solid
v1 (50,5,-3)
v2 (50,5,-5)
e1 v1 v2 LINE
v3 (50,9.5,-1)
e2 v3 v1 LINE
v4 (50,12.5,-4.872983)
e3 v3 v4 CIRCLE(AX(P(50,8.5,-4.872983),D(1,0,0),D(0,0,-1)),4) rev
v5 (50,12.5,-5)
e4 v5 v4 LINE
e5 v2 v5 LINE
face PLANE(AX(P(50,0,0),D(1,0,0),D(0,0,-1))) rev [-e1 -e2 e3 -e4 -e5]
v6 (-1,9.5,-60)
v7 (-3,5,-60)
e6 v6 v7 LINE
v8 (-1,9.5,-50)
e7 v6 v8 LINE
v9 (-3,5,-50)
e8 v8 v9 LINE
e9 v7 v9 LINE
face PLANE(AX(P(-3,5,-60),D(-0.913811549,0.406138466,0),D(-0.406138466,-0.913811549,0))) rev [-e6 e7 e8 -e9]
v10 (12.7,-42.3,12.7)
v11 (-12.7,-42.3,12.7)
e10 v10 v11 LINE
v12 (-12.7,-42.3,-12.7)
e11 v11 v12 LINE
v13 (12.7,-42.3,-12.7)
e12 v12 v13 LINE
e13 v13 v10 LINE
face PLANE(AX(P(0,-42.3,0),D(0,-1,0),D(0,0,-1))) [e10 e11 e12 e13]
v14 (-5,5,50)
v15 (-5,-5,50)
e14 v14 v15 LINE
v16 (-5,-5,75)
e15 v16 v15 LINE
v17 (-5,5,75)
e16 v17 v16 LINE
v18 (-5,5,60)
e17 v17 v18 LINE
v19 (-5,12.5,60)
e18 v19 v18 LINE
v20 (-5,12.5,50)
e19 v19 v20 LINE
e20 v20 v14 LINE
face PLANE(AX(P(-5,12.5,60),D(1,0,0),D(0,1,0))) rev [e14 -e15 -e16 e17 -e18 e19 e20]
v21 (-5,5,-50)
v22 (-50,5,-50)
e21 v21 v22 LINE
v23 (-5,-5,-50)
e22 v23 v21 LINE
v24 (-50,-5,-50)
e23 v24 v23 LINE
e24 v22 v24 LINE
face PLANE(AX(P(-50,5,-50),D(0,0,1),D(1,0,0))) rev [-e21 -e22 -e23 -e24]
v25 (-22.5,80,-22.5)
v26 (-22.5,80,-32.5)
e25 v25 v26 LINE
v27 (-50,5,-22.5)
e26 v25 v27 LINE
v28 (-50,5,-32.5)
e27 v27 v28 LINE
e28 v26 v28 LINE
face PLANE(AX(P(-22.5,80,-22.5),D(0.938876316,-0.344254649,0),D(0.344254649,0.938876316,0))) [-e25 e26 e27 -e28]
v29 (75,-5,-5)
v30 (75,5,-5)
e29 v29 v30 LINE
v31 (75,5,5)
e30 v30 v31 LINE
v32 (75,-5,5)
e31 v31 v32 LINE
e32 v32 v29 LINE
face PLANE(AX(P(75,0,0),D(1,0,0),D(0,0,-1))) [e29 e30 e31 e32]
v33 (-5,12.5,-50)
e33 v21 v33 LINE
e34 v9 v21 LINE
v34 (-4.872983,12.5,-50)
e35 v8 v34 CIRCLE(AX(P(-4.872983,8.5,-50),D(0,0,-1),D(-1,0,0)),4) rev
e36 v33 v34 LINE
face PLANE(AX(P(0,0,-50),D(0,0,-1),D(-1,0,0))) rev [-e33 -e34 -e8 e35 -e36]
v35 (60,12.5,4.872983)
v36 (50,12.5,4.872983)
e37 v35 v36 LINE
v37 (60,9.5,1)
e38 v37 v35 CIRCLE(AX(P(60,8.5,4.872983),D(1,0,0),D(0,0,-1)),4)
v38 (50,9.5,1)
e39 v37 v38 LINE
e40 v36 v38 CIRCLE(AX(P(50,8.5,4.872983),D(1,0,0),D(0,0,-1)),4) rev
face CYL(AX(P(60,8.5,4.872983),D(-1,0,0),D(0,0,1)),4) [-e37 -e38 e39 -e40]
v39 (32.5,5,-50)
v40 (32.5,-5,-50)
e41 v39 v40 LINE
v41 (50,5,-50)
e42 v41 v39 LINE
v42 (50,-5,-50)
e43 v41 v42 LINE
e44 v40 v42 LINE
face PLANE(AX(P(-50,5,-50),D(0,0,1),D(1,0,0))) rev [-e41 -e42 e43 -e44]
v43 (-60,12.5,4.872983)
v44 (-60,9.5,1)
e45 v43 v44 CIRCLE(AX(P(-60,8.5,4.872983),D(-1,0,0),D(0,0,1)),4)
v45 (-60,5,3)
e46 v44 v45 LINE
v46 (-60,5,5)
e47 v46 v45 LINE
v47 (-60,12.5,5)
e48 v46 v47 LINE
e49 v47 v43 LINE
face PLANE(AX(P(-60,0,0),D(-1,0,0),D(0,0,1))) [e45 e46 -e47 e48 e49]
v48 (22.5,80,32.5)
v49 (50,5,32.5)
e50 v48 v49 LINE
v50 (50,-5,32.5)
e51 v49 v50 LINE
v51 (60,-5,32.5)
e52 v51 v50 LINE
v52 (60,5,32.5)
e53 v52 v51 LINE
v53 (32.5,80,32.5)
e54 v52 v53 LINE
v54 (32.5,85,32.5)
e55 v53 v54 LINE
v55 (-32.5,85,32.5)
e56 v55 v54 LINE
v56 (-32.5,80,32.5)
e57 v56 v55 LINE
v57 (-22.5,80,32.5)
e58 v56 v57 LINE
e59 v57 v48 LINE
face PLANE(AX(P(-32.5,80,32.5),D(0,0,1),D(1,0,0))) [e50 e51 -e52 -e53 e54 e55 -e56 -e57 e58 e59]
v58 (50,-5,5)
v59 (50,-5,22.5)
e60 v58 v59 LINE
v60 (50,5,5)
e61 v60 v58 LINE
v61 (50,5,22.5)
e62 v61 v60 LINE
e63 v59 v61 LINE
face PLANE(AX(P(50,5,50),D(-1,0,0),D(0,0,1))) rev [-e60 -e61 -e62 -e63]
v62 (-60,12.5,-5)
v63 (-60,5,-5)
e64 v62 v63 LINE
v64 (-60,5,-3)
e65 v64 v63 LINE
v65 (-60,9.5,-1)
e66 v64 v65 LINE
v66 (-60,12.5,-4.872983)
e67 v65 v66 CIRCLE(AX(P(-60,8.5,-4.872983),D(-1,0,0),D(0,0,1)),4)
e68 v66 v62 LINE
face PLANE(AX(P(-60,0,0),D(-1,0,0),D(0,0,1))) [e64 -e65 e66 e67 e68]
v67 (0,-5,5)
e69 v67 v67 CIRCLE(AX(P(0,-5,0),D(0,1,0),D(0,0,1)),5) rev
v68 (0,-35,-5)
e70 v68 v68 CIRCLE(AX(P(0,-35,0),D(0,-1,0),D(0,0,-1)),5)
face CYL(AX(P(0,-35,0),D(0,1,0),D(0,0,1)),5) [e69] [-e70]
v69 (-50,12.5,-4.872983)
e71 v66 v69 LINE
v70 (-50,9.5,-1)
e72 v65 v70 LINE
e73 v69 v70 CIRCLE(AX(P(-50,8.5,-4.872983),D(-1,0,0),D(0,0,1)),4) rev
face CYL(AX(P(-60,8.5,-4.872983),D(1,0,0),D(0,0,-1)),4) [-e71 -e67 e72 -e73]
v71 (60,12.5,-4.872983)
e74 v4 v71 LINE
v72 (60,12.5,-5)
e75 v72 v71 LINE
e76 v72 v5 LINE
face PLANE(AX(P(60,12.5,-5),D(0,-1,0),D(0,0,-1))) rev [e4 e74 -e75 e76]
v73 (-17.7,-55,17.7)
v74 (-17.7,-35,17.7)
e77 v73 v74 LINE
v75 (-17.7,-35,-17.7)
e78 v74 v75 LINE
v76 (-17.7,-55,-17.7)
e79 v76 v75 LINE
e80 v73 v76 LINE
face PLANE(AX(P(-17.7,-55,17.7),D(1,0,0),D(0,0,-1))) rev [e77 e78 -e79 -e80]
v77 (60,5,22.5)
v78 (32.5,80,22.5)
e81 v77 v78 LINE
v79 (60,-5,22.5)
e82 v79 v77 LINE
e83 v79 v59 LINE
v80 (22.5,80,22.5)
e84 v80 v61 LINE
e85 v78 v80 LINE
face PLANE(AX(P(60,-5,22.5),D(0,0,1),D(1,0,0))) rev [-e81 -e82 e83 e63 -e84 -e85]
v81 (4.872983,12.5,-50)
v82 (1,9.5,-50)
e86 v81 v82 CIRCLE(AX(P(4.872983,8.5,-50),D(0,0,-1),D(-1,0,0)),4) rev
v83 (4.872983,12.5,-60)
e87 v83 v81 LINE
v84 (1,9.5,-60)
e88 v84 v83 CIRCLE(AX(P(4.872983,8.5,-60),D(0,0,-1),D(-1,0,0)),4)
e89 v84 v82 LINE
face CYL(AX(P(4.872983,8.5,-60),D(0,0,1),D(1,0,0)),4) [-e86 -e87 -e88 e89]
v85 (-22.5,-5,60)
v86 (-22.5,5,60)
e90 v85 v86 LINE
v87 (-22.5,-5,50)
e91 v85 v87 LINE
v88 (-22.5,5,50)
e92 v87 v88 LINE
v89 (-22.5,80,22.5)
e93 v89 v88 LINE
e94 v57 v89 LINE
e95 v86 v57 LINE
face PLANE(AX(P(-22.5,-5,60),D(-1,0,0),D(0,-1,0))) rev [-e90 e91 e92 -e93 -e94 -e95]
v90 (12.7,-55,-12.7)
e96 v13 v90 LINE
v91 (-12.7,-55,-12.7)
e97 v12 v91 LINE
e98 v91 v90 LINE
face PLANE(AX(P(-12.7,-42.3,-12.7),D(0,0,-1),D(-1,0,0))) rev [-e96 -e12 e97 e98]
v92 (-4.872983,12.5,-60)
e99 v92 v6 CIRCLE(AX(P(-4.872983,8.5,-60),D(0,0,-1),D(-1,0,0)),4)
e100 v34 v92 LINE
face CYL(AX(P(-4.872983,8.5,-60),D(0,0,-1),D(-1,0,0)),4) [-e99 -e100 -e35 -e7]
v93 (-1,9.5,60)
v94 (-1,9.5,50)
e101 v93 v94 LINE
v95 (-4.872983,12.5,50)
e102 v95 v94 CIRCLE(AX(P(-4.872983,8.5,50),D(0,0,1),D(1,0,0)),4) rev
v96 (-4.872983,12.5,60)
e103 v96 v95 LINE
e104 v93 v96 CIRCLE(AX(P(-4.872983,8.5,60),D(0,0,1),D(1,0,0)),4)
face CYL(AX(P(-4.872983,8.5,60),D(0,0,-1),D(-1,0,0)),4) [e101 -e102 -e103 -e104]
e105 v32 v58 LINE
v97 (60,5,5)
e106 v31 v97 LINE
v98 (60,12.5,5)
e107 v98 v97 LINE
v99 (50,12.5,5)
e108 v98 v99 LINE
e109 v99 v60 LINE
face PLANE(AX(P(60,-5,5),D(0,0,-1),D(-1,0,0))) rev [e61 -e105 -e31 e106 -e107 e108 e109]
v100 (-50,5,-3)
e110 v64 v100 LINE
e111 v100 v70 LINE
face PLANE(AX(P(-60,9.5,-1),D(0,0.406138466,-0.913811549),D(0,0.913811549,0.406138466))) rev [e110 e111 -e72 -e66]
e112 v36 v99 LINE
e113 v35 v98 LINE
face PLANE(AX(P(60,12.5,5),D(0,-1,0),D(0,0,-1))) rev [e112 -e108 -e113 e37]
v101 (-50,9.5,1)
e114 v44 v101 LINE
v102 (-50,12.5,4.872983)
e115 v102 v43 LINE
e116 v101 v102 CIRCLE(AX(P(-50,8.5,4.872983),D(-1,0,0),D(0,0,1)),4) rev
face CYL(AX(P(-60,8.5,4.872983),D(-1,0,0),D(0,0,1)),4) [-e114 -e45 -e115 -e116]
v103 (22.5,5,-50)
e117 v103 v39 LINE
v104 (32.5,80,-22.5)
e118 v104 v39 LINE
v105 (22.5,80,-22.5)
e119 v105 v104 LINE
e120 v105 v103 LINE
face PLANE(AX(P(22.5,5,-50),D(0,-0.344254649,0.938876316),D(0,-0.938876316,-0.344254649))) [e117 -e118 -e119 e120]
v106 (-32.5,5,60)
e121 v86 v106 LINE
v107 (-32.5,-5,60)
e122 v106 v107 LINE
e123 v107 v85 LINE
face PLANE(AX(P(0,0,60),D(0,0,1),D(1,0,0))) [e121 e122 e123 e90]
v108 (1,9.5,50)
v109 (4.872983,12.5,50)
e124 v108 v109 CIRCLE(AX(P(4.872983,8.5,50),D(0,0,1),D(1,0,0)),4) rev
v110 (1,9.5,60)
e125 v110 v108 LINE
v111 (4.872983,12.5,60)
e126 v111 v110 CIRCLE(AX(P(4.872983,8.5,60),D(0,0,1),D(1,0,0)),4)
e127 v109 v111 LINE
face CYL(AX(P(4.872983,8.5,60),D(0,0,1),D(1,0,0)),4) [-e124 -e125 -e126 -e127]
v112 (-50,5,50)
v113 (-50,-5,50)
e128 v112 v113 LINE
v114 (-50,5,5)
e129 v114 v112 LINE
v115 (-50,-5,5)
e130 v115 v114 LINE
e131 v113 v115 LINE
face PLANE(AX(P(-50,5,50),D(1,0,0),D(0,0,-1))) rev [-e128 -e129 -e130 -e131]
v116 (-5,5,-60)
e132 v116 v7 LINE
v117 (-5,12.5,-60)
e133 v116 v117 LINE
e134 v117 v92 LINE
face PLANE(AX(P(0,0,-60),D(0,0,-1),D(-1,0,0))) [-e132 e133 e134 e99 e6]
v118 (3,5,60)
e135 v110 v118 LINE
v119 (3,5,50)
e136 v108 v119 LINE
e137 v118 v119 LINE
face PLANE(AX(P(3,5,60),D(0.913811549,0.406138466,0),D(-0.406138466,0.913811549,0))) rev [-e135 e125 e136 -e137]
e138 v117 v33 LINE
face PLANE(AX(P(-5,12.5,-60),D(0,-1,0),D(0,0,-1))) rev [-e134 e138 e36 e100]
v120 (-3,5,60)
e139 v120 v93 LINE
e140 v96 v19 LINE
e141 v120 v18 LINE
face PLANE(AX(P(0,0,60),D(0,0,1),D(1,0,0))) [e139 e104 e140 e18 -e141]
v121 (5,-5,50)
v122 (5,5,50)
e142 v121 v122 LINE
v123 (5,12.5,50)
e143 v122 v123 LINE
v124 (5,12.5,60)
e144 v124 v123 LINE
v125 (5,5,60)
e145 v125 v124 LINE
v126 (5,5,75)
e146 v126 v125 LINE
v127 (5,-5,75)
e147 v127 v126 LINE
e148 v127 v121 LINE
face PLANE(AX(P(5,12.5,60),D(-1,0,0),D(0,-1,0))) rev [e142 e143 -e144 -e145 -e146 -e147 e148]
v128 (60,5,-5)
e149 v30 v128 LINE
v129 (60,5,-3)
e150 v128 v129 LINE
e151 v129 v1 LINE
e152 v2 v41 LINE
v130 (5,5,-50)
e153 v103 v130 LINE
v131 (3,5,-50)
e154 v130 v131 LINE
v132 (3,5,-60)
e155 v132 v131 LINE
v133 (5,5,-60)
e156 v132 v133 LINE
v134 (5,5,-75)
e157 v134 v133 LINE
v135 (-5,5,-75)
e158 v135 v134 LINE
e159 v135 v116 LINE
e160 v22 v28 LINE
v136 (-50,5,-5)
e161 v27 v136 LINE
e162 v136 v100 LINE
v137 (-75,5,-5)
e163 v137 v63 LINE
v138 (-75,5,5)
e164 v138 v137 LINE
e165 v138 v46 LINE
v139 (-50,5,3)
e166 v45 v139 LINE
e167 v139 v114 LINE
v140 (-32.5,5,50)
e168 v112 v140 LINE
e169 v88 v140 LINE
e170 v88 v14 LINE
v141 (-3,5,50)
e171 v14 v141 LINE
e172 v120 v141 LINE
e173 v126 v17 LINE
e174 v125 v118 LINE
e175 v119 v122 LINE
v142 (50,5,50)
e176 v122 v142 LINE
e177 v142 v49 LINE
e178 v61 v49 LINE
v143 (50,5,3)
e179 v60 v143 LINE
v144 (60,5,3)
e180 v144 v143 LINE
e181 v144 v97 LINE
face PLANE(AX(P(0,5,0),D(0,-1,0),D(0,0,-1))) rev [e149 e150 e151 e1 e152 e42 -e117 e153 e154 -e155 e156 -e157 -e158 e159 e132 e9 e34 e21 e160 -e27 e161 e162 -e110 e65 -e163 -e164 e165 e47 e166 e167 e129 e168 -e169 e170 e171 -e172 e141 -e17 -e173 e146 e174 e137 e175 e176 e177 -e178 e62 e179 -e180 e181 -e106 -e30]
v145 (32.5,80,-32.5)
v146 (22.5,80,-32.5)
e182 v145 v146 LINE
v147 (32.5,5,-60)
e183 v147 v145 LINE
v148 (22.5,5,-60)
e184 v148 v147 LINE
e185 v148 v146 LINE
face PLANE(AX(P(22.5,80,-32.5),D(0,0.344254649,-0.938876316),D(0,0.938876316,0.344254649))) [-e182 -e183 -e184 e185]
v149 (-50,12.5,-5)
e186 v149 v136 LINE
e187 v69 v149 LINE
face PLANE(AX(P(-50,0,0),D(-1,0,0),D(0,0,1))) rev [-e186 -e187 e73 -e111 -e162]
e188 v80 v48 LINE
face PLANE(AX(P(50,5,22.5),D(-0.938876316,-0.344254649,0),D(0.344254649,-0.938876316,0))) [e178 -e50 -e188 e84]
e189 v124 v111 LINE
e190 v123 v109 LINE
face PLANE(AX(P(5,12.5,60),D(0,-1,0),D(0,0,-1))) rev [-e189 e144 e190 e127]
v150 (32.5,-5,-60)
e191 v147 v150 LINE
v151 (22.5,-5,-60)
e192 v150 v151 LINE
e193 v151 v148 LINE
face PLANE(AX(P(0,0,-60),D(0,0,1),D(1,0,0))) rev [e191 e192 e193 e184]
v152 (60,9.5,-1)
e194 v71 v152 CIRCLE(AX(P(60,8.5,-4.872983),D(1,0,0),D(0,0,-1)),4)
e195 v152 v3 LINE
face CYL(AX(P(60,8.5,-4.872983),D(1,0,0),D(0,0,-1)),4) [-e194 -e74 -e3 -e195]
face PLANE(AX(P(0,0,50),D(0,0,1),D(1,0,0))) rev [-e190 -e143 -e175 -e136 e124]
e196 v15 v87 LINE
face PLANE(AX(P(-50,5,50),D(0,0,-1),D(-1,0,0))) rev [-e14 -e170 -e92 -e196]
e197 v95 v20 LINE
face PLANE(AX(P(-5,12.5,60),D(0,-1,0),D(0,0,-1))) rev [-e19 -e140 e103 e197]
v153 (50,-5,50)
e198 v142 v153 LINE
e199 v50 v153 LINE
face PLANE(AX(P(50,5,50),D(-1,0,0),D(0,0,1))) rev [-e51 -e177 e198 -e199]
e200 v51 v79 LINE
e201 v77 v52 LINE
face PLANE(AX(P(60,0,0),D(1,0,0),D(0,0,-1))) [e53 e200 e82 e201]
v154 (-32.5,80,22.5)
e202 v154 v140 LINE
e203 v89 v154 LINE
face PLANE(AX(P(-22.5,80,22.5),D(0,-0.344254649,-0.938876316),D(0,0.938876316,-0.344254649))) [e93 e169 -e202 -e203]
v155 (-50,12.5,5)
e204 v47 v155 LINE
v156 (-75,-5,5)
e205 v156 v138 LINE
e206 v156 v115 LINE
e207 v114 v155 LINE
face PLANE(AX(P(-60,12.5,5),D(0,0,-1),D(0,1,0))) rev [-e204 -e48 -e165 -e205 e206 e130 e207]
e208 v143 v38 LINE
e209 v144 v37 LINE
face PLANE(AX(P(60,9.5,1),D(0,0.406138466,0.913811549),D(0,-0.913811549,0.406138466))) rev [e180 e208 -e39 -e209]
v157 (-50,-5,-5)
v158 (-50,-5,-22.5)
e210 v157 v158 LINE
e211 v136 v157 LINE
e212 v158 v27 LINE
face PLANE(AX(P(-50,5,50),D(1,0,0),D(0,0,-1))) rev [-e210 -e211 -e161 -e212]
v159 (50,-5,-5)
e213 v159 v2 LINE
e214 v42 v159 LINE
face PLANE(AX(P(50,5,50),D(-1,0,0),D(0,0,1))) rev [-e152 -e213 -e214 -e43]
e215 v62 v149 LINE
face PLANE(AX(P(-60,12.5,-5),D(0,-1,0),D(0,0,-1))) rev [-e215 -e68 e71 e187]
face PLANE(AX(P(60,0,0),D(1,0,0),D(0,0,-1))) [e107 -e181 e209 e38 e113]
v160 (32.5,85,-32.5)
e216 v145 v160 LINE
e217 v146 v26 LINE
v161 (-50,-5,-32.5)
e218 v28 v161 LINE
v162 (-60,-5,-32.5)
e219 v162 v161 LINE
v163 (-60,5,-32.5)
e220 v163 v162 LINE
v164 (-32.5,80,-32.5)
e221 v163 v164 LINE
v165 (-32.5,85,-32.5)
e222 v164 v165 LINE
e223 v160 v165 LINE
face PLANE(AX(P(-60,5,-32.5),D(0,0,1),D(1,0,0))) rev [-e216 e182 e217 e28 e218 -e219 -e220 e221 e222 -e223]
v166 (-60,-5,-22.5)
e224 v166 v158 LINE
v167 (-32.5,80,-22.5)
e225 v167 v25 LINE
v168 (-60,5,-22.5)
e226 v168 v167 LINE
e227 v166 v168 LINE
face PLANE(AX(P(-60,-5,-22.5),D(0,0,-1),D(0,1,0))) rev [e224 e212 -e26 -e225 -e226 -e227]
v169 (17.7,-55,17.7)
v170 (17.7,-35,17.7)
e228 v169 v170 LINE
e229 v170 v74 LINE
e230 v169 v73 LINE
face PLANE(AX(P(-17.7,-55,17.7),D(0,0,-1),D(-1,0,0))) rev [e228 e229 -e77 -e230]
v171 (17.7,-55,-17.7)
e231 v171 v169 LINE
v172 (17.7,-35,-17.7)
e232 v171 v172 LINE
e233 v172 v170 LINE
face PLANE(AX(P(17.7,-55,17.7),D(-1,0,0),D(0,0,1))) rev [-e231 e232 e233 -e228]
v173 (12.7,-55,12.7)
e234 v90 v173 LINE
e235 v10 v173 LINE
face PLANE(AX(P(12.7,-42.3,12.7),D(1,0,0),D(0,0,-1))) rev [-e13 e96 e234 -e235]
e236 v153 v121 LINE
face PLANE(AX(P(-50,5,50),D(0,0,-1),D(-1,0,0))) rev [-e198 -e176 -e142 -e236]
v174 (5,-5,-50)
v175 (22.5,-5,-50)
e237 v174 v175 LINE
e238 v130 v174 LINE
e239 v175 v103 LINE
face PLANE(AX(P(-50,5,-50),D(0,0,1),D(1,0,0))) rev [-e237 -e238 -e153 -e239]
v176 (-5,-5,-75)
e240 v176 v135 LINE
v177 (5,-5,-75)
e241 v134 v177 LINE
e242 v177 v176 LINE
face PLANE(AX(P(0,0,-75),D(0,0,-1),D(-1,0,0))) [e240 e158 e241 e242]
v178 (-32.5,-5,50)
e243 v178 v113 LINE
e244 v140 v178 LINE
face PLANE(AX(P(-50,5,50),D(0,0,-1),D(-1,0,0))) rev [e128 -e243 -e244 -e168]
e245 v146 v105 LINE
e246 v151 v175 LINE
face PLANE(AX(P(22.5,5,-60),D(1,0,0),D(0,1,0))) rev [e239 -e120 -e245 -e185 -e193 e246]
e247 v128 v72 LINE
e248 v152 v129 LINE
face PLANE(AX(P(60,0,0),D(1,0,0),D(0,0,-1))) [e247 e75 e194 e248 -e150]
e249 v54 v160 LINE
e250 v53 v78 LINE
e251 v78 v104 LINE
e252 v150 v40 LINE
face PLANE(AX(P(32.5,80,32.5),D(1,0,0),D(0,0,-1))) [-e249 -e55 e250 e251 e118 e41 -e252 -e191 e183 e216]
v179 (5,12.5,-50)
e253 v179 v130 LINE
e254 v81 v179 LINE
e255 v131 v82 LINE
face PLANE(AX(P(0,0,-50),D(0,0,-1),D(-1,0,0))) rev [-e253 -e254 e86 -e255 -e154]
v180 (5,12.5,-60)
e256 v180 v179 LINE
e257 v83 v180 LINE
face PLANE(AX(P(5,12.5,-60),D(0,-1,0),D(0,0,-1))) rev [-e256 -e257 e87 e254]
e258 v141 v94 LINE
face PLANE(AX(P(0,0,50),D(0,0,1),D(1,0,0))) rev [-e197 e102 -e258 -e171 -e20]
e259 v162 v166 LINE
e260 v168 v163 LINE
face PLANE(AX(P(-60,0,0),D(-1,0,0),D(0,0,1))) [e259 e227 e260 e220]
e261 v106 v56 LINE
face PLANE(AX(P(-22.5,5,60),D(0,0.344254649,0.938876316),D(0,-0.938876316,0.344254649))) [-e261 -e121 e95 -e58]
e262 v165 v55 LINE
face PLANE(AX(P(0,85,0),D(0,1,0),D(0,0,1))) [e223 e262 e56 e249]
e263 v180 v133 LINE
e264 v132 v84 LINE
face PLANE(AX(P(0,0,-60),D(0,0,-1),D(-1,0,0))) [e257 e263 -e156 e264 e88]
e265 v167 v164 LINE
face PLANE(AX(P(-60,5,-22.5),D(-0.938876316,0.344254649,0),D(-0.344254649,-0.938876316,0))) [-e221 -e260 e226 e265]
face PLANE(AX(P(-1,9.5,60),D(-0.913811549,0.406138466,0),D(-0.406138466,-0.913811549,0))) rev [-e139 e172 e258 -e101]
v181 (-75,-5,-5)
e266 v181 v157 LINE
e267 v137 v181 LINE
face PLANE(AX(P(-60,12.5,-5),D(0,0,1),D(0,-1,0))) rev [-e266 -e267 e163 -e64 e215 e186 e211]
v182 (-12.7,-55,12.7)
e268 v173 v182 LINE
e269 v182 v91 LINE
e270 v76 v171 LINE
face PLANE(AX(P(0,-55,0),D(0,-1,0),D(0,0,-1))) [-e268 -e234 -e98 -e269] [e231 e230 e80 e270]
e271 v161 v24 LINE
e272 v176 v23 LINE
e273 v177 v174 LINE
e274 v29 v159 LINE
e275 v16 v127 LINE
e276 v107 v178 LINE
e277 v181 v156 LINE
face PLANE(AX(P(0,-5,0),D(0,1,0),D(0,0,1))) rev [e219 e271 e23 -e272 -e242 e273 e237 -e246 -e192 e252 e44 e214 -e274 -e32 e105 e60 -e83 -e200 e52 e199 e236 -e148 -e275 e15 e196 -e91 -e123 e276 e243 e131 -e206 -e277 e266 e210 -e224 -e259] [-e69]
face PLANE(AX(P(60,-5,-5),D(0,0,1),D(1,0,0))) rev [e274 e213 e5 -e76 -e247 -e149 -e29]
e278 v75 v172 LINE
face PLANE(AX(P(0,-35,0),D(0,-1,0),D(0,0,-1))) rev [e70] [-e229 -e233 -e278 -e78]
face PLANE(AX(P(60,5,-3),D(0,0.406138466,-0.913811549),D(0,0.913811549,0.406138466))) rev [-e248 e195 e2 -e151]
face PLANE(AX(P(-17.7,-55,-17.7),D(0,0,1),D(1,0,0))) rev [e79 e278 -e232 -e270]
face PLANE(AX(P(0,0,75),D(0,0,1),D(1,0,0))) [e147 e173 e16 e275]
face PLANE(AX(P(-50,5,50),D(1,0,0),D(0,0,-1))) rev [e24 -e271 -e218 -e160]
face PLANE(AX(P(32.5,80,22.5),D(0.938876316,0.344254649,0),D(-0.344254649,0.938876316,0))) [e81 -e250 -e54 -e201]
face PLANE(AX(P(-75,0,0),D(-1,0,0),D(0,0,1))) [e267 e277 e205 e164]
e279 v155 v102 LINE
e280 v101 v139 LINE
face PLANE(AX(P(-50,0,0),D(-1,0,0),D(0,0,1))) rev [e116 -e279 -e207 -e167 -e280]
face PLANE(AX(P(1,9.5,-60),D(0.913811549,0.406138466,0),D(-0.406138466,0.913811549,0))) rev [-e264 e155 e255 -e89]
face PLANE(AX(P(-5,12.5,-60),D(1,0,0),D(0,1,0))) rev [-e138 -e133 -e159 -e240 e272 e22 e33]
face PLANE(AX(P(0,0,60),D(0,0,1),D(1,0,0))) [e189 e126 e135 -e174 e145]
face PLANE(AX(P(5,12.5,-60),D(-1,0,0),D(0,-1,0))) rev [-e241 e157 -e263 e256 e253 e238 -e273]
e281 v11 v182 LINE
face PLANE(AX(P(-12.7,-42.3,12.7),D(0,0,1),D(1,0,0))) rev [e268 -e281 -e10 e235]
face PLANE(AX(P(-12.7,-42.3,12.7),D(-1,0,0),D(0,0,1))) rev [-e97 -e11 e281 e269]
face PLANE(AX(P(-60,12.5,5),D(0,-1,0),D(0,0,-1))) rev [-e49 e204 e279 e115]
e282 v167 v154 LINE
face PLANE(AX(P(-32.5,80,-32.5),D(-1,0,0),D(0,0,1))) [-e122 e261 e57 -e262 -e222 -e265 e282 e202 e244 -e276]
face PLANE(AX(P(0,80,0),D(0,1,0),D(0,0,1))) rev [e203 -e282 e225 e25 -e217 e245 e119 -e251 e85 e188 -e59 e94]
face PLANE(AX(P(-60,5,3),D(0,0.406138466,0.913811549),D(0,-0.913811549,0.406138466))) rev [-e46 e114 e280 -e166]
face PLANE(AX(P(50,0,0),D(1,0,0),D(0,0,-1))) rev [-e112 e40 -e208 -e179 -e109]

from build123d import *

# Parameters (mm, degrees)
SKETCH2_W            = 100
SKETCH2_H            = 100
BOSS_EXTRUDE1_DEPTH  = 5
SKETCH3_W            = 100
SKETCH3_H            = 100
BOSS_EXTRUDE2_DEPTH  = 5
SKETCH8_R            = 5
BOSS_EXTRUDE7_DEPTH  = 30
SKETCH9_W            = 35.4
SKETCH9_H            = 35.4
BOSS_EXTRUDE8_DEPTH  = 20
SKETCH10_W           = 25.4
SKETCH10_H           = 25.4
CUT_EXTRUDE1_DEPTH   = 12.7
BOSS_EXTRUDE21_DEPTH = 10
FILLET14_R           = 4
FILLET13_R           = 4
SKETCH24_W           = 10
SKETCH24_H           = 10
BOSS_EXTRUDE22_DEPTH = 15
BOSS_EXTRUDE25_DEPTH = 10
SKETCH26_W           = 10
SKETCH26_H           = 10
BOSS_EXTRUDE26_DEPTH = 15
FILLET18_R           = 4
FILLET17_R           = 4
BOSS_EXTRUDE23_DEPTH = 10
SKETCH25_W           = 10
SKETCH25_H           = 10
BOSS_EXTRUDE24_DEPTH = 15
FILLET15_R           = 4
FILLET16_R           = 4
BOSS_EXTRUDE10_DEPTH = 10
FILLET19_R           = 4
SKETCH27_W           = 10
SKETCH27_H           = 10
BOSS_EXTRUDE27_DEPTH = 15
FILLET20_R           = 4
SKETCH33_W           = 65
SKETCH33_H           = 65
BOSS_EXTRUDE29_DEPTH = 5
BOSS_EXTRUDE28_DEPTH = 10
BOSS_EXTRUDE32_DEPTH = 10
BOSS_EXTRUDE31_DEPTH = 10
BOSS_EXTRUDE33_DEPTH = 10
BOSS_EXTRUDE34_DEPTH = 10
BOSS_EXTRUDE35_DEPTH = 10
BOSS_EXTRUDE36_DEPTH = 10
BOSS_EXTRUDE37_DEPTH = 10


with BuildPart() as part:
    # Sketch2 → Boss-Extrude1 (new body)
    with BuildSketch(Plane(origin=(0, 0, 0), x_dir=(1, 0, 0), z_dir=(0, 1, 0))):
        Rectangle(SKETCH2_W, SKETCH2_H)
    extrude(amount=BOSS_EXTRUDE1_DEPTH)

    # Sketch3 → Boss-Extrude2 (add)
    with BuildSketch(Plane.XZ):
        Rectangle(SKETCH3_W, SKETCH3_H)
    extrude(amount=BOSS_EXTRUDE2_DEPTH)

    # Sketch8 → Boss-Extrude7 (add)
    with BuildSketch(Plane.XZ.offset(5)):
        with Locations(Location((0, 0, 0), (0, 0, 90))):
            Circle(SKETCH8_R)
    extrude(amount=BOSS_EXTRUDE7_DEPTH)

    # Sketch9 → Boss-Extrude8 (add)
    with BuildSketch(Plane.XZ.offset(35)):
        Rectangle(SKETCH9_W, SKETCH9_H)
    extrude(amount=BOSS_EXTRUDE8_DEPTH)

    # Sketch10 → Cut-Extrude1 (cut)
    with BuildSketch(Plane.XZ.offset(55)):
        Rectangle(SKETCH10_W, SKETCH10_H)
    extrude(amount=-CUT_EXTRUDE1_DEPTH, mode=Mode.SUBTRACT)

    # Sketch11 → Boss-Extrude21 (add)
    with BuildSketch(Plane(origin=(50, 0, 0), x_dir=(0, 0, -1), z_dir=(1, 0, 0))):
        Polygon((5, -5), (5, 12.5), (1, 12.5), (1, 9.5), (3, 5), (-3, 5), (-1, 9.5), (-1, 12.5), (-5, 12.5), (-5, -5), align=None)
    extrude(amount=BOSS_EXTRUDE21_DEPTH)

    # Fillet14
    # the kernel refuses this fillet: 4 mm, written as the material it takes off along each edge
    with BuildSketch(Plane(origin=(40.317541634, 12.5, -1), x_dir=(0, 0, -1), z_dir=(1, 0, 0))) as fillet14_piece_1:
        with BuildLine():
            CenterArc((3.872983346, -4), FILLET14_R, 90, 75.522487814)
            Line((0, -3), (-0.077459667, -2.98))
            ThreePointArc((-0.077459667, -2.98), (-0.08, -1.5), (-0.08, 0))
            Line((-0.08, 0), (0, 0.08))
            Line((0, 0.08), (3.872983346, 0.08))
            Line((3.872983346, 0.08), (3.872983346, 0))
        make_face()
    extrude(amount=29.364916731, mode=Mode.SUBTRACT)

    # Fillet13
    # the kernel refuses this fillet: 4 mm, written as the material it takes off along each edge
    with BuildSketch(Plane(origin=(40.317541634, 12.5, 1), x_dir=(0, 0, 1), z_dir=(1, 0, 0))) as fillet13_piece_1:
        with BuildLine():
            CenterArc((3.872983346, 4), FILLET13_R, 194.477512186, 75.522487814)
            Line((0, 3), (-0.077459667, 2.98))
            ThreePointArc((-0.077459667, 2.98), (-0.08, 1.5), (-0.08, 0))
            Line((-0.08, 0), (0, -0.08))
            Line((0, -0.08), (3.872983346, -0.08))
            Line((3.872983346, -0.08), (3.872983346, 0))
        make_face()
    extrude(amount=29.364916731, mode=Mode.SUBTRACT)

    # Sketch24 → Boss-Extrude22 (add)
    with BuildSketch(Plane(origin=(60, 0, 0), x_dir=(0, 0, -1), z_dir=(1, 0, 0))):
        Rectangle(SKETCH24_W, SKETCH24_H)
    extrude(amount=BOSS_EXTRUDE22_DEPTH)

    # Sketch13 → Boss-Extrude25 (add)
    with BuildSketch(Plane.ZY.offset(50)):
        Polygon((-5, 12.5), (-5, -5), (5, -5), (5, 12.5), (1, 12.5), (1, 9.5), (3, 5), (-3, 5), (-1, 9.5), (-1, 12.5), align=None)
    extrude(amount=BOSS_EXTRUDE25_DEPTH)

    # Sketch26 → Boss-Extrude26 (add)
    with BuildSketch(Plane.ZY.offset(60)):
        Rectangle(SKETCH26_W, SKETCH26_H)
    extrude(amount=BOSS_EXTRUDE26_DEPTH)

    # Fillet18
    # the kernel refuses this fillet: 4 mm, written as the material it takes off along each edge
    with BuildSketch(Plane(origin=(-40.317541634, 12.5, 1), x_dir=(0, 0, 1), z_dir=(-1, 0, 0))) as fillet18_piece_1:
        with BuildLine():
            CenterArc((3.872983346, -4), FILLET18_R, 90, 75.522487814)
            Line((0, -3), (-0.077459667, -2.98))
            ThreePointArc((-0.077459667, -2.98), (-0.08, -1.5), (-0.08, 0))
            Line((-0.08, 0), (0, 0.08))
            Line((0, 0.08), (3.872983346, 0.08))
            Line((3.872983346, 0.08), (3.872983346, 0))
        make_face()
    extrude(amount=29.364916731, mode=Mode.SUBTRACT)

    # Fillet17
    # the kernel refuses this fillet: 4 mm, written as the material it takes off along each edge
    with BuildSketch(Plane(origin=(-40.317541634, 12.5, -1), x_dir=(0, 0, -1), z_dir=(-1, 0, 0))) as fillet17_piece_1:
        with BuildLine():
            CenterArc((3.872983346, 4), FILLET17_R, 194.477512186, 75.522487814)
            Line((0, 3), (-0.077459667, 2.98))
            ThreePointArc((-0.077459667, 2.98), (-0.08, 1.5), (-0.08, 0))
            Line((-0.08, 0), (0, -0.08))
            Line((0, -0.08), (3.872983346, -0.08))
            Line((3.872983346, -0.08), (3.872983346, 0))
        make_face()
    extrude(amount=29.364916731, mode=Mode.SUBTRACT)

    # Sketch14 → Boss-Extrude23 (add)
    with BuildSketch(Plane(origin=(0, 0, -50), x_dir=(-1, 0, 0), z_dir=(0, 0, -1))):
        Polygon((-5, 12.5), (-1, 12.5), (-1, 9.5), (-3, 5), (3, 5), (1, 9.5), (1, 12.5), (5, 12.5), (5, -5), (-5, -5), align=None)
    extrude(amount=BOSS_EXTRUDE23_DEPTH)

    # Sketch25 → Boss-Extrude24 (add)
    with BuildSketch(Plane(origin=(0, 0, -60), x_dir=(-1, 0, 0), z_dir=(0, 0, -1))):
        Rectangle(SKETCH25_W, SKETCH25_H)
    extrude(amount=BOSS_EXTRUDE24_DEPTH)

    # Fillet15
    # the kernel refuses this fillet: 4 mm, written as the material it takes off along each edge
    with BuildSketch(Plane(origin=(-1, 12.5, -40.317541634), x_dir=(0, -1, 0), z_dir=(0, 0, -1))) as fillet15_piece_1:
        with BuildLine():
            CenterArc((4, 3.872983346), FILLET15_R, 180, 75.522487814)
            Line((0, 3.872983346), (-0.08, 3.872983346))
            Line((-0.08, 3.872983346), (-0.08, 0))
            Line((-0.08, 0), (0, -0.08))
            ThreePointArc((0, -0.08), (1.5, -0.08), (2.98, -0.077459667))
            Line((2.98, -0.077459667), (3, 0))
        make_face()
    extrude(amount=29.364916731, mode=Mode.SUBTRACT)

    # Fillet16
    # the kernel refuses this fillet: 4 mm, written as the material it takes off along each edge
    with BuildSketch(Plane(origin=(1, 12.5, -40.317541634), x_dir=(1, 0, 0), z_dir=(0, 0, -1))) as fillet16_piece_1:
        with BuildLine():
            CenterArc((3.872983346, 4), FILLET16_R, 194.477512186, 75.522487814)
            Line((0, 3), (-0.077459667, 2.98))
            ThreePointArc((-0.077459667, 2.98), (-0.08, 1.5), (-0.08, 0))
            Line((-0.08, 0), (0, -0.08))
            Line((0, -0.08), (3.872983346, -0.08))
            Line((3.872983346, -0.08), (3.872983346, 0))
        make_face()
    extrude(amount=29.364916731, mode=Mode.SUBTRACT)

    # Sketch12 → Boss-Extrude10 (add)
    with BuildSketch(Plane.XY.offset(50)):
        Polygon((-5, 12.5), (-5, -5), (5, -5), (5, 12.5), (1, 12.5), (1, 9.5), (3, 5), (-3, 5), (-1, 9.5), (-1, 12.5), align=None)
    extrude(amount=BOSS_EXTRUDE10_DEPTH)

    # Fillet19
    # the kernel refuses this fillet: 4 mm, written as the material it takes off along each edge
    with BuildSketch(Plane(origin=(-1, 12.5, 40.317541634), x_dir=(-1, 0, 0), z_dir=(0, 0, 1))) as fillet19_piece_1:
        with BuildLine():
            CenterArc((3.872983346, 4), FILLET19_R, 194.477512186, 75.522487814)
            Line((0, 3), (-0.077459667, 2.98))
            ThreePointArc((-0.077459667, 2.98), (-0.08, 1.5), (-0.08, 0))
            Line((-0.08, 0), (0, -0.08))
            Line((0, -0.08), (3.872983346, -0.08))
            Line((3.872983346, -0.08), (3.872983346, 0))
        make_face()
    extrude(amount=29.364916731, mode=Mode.SUBTRACT)

    # Sketch27 → Boss-Extrude27 (add)
    with BuildSketch(Plane.XY.offset(60)):
        Rectangle(SKETCH27_W, SKETCH27_H)
    extrude(amount=BOSS_EXTRUDE27_DEPTH)

    # Fillet20
    # the kernel refuses this fillet: 4 mm, written as the material it takes off along each edge
    with BuildSketch(Plane(origin=(1, 12.5, 40.317541634), x_dir=(1, 0, 0), z_dir=(0, 0, 1))) as fillet20_piece_1:
        with BuildLine():
            CenterArc((3.872983346, -4), FILLET20_R, 90, 75.522487814)
            Line((0, -3), (-0.077459667, -2.98))
            ThreePointArc((-0.077459667, -2.98), (-0.08, -1.5), (-0.08, 0))
            Line((-0.08, 0), (0, 0.08))
            Line((0, 0.08), (3.872983346, 0.08))
            Line((3.872983346, 0.08), (3.872983346, 0))
        make_face()
    extrude(amount=29.364916731, mode=Mode.SUBTRACT)

    # Sketch30 → Boss-Extrude28 (add)
    with BuildSketch(Plane.ZY.offset(50)):
        Polygon((-27.5, 5), (-22.5, 5), (-22.5, -5), (-32.5, -5), (-32.5, 5), align=None)
    extrude(amount=BOSS_EXTRUDE28_DEPTH)



with BuildPart() as body_2:
    # Sketch33 → Boss-Extrude29 (new body)
    with BuildSketch(Plane(origin=(0, 85, 0), x_dir=(1, 0, 0), z_dir=(0, 1, 0))):
        Rectangle(SKETCH33_W, SKETCH33_H)
    extrude(amount=-BOSS_EXTRUDE29_DEPTH)


with BuildPart() as part_1:
    add(part.part)

    add(body_2.part)  # Boss-Extrude32 merges body 2
    # Sketch40 → Boss-Extrude32 (add)
    with BuildSketch(Plane(origin=(0, 0, -32.5), x_dir=(-1, 0, 0), z_dir=(0, 0, -1))):
        Polygon((60, 5), (32.5, 80), (22.5, 80), (50, 5), align=None)
    extrude(amount=-BOSS_EXTRUDE32_DEPTH)

    # Sketch37 → Boss-Extrude31 (add)
    with BuildSketch(Plane.XY.offset(50)):
        Polygon((-27.5, 5), (-22.5, 5), (-22.5, -5), (-32.5, -5), (-32.5, 5), align=None)
    extrude(amount=BOSS_EXTRUDE31_DEPTH)

    # Sketch41 → Boss-Extrude33 (add)
    with BuildSketch(Plane.ZY.offset(32.5)):
        Polygon((60, 5), (32.5, 80), (22.5, 80), (50, 5), align=None)
    extrude(amount=-BOSS_EXTRUDE33_DEPTH)

    # Sketch42 → Boss-Extrude34 (add)
    with BuildSketch(Plane(origin=(50, 0, 0), x_dir=(0, 0, -1), z_dir=(1, 0, 0))):
        Polygon((-27.5, 5), (-22.5, 5), (-22.5, -5), (-32.5, -5), (-32.5, 5), align=None)
    extrude(amount=BOSS_EXTRUDE34_DEPTH)

    # Sketch43 → Boss-Extrude35 (add)
    with BuildSketch(Plane.XY.offset(32.5)):
        Polygon((32.5, 80), (60, 5), (50, 5), (22.5, 80), align=None)
    extrude(amount=-BOSS_EXTRUDE35_DEPTH)

    # Sketch44 → Boss-Extrude36 (add)
    with BuildSketch(Plane(origin=(0, 0, -50), x_dir=(-1, 0, 0), z_dir=(0, 0, -1))):
        Polygon((-27.5, 5), (-22.5, 5), (-22.5, -5), (-32.5, -5), (-32.5, 5), align=None)
    extrude(amount=BOSS_EXTRUDE36_DEPTH)

    # Sketch45 → Boss-Extrude37 (add)
    with BuildSketch(Plane(origin=(32.5, 0, 0), x_dir=(0, 0, -1), z_dir=(1, 0, 0))):
        Polygon((32.5, 80), (60, 5), (50, 5), (22.5, 80), align=None)
    extrude(amount=-BOSS_EXTRUDE37_DEPTH)


solid = part_1.part
